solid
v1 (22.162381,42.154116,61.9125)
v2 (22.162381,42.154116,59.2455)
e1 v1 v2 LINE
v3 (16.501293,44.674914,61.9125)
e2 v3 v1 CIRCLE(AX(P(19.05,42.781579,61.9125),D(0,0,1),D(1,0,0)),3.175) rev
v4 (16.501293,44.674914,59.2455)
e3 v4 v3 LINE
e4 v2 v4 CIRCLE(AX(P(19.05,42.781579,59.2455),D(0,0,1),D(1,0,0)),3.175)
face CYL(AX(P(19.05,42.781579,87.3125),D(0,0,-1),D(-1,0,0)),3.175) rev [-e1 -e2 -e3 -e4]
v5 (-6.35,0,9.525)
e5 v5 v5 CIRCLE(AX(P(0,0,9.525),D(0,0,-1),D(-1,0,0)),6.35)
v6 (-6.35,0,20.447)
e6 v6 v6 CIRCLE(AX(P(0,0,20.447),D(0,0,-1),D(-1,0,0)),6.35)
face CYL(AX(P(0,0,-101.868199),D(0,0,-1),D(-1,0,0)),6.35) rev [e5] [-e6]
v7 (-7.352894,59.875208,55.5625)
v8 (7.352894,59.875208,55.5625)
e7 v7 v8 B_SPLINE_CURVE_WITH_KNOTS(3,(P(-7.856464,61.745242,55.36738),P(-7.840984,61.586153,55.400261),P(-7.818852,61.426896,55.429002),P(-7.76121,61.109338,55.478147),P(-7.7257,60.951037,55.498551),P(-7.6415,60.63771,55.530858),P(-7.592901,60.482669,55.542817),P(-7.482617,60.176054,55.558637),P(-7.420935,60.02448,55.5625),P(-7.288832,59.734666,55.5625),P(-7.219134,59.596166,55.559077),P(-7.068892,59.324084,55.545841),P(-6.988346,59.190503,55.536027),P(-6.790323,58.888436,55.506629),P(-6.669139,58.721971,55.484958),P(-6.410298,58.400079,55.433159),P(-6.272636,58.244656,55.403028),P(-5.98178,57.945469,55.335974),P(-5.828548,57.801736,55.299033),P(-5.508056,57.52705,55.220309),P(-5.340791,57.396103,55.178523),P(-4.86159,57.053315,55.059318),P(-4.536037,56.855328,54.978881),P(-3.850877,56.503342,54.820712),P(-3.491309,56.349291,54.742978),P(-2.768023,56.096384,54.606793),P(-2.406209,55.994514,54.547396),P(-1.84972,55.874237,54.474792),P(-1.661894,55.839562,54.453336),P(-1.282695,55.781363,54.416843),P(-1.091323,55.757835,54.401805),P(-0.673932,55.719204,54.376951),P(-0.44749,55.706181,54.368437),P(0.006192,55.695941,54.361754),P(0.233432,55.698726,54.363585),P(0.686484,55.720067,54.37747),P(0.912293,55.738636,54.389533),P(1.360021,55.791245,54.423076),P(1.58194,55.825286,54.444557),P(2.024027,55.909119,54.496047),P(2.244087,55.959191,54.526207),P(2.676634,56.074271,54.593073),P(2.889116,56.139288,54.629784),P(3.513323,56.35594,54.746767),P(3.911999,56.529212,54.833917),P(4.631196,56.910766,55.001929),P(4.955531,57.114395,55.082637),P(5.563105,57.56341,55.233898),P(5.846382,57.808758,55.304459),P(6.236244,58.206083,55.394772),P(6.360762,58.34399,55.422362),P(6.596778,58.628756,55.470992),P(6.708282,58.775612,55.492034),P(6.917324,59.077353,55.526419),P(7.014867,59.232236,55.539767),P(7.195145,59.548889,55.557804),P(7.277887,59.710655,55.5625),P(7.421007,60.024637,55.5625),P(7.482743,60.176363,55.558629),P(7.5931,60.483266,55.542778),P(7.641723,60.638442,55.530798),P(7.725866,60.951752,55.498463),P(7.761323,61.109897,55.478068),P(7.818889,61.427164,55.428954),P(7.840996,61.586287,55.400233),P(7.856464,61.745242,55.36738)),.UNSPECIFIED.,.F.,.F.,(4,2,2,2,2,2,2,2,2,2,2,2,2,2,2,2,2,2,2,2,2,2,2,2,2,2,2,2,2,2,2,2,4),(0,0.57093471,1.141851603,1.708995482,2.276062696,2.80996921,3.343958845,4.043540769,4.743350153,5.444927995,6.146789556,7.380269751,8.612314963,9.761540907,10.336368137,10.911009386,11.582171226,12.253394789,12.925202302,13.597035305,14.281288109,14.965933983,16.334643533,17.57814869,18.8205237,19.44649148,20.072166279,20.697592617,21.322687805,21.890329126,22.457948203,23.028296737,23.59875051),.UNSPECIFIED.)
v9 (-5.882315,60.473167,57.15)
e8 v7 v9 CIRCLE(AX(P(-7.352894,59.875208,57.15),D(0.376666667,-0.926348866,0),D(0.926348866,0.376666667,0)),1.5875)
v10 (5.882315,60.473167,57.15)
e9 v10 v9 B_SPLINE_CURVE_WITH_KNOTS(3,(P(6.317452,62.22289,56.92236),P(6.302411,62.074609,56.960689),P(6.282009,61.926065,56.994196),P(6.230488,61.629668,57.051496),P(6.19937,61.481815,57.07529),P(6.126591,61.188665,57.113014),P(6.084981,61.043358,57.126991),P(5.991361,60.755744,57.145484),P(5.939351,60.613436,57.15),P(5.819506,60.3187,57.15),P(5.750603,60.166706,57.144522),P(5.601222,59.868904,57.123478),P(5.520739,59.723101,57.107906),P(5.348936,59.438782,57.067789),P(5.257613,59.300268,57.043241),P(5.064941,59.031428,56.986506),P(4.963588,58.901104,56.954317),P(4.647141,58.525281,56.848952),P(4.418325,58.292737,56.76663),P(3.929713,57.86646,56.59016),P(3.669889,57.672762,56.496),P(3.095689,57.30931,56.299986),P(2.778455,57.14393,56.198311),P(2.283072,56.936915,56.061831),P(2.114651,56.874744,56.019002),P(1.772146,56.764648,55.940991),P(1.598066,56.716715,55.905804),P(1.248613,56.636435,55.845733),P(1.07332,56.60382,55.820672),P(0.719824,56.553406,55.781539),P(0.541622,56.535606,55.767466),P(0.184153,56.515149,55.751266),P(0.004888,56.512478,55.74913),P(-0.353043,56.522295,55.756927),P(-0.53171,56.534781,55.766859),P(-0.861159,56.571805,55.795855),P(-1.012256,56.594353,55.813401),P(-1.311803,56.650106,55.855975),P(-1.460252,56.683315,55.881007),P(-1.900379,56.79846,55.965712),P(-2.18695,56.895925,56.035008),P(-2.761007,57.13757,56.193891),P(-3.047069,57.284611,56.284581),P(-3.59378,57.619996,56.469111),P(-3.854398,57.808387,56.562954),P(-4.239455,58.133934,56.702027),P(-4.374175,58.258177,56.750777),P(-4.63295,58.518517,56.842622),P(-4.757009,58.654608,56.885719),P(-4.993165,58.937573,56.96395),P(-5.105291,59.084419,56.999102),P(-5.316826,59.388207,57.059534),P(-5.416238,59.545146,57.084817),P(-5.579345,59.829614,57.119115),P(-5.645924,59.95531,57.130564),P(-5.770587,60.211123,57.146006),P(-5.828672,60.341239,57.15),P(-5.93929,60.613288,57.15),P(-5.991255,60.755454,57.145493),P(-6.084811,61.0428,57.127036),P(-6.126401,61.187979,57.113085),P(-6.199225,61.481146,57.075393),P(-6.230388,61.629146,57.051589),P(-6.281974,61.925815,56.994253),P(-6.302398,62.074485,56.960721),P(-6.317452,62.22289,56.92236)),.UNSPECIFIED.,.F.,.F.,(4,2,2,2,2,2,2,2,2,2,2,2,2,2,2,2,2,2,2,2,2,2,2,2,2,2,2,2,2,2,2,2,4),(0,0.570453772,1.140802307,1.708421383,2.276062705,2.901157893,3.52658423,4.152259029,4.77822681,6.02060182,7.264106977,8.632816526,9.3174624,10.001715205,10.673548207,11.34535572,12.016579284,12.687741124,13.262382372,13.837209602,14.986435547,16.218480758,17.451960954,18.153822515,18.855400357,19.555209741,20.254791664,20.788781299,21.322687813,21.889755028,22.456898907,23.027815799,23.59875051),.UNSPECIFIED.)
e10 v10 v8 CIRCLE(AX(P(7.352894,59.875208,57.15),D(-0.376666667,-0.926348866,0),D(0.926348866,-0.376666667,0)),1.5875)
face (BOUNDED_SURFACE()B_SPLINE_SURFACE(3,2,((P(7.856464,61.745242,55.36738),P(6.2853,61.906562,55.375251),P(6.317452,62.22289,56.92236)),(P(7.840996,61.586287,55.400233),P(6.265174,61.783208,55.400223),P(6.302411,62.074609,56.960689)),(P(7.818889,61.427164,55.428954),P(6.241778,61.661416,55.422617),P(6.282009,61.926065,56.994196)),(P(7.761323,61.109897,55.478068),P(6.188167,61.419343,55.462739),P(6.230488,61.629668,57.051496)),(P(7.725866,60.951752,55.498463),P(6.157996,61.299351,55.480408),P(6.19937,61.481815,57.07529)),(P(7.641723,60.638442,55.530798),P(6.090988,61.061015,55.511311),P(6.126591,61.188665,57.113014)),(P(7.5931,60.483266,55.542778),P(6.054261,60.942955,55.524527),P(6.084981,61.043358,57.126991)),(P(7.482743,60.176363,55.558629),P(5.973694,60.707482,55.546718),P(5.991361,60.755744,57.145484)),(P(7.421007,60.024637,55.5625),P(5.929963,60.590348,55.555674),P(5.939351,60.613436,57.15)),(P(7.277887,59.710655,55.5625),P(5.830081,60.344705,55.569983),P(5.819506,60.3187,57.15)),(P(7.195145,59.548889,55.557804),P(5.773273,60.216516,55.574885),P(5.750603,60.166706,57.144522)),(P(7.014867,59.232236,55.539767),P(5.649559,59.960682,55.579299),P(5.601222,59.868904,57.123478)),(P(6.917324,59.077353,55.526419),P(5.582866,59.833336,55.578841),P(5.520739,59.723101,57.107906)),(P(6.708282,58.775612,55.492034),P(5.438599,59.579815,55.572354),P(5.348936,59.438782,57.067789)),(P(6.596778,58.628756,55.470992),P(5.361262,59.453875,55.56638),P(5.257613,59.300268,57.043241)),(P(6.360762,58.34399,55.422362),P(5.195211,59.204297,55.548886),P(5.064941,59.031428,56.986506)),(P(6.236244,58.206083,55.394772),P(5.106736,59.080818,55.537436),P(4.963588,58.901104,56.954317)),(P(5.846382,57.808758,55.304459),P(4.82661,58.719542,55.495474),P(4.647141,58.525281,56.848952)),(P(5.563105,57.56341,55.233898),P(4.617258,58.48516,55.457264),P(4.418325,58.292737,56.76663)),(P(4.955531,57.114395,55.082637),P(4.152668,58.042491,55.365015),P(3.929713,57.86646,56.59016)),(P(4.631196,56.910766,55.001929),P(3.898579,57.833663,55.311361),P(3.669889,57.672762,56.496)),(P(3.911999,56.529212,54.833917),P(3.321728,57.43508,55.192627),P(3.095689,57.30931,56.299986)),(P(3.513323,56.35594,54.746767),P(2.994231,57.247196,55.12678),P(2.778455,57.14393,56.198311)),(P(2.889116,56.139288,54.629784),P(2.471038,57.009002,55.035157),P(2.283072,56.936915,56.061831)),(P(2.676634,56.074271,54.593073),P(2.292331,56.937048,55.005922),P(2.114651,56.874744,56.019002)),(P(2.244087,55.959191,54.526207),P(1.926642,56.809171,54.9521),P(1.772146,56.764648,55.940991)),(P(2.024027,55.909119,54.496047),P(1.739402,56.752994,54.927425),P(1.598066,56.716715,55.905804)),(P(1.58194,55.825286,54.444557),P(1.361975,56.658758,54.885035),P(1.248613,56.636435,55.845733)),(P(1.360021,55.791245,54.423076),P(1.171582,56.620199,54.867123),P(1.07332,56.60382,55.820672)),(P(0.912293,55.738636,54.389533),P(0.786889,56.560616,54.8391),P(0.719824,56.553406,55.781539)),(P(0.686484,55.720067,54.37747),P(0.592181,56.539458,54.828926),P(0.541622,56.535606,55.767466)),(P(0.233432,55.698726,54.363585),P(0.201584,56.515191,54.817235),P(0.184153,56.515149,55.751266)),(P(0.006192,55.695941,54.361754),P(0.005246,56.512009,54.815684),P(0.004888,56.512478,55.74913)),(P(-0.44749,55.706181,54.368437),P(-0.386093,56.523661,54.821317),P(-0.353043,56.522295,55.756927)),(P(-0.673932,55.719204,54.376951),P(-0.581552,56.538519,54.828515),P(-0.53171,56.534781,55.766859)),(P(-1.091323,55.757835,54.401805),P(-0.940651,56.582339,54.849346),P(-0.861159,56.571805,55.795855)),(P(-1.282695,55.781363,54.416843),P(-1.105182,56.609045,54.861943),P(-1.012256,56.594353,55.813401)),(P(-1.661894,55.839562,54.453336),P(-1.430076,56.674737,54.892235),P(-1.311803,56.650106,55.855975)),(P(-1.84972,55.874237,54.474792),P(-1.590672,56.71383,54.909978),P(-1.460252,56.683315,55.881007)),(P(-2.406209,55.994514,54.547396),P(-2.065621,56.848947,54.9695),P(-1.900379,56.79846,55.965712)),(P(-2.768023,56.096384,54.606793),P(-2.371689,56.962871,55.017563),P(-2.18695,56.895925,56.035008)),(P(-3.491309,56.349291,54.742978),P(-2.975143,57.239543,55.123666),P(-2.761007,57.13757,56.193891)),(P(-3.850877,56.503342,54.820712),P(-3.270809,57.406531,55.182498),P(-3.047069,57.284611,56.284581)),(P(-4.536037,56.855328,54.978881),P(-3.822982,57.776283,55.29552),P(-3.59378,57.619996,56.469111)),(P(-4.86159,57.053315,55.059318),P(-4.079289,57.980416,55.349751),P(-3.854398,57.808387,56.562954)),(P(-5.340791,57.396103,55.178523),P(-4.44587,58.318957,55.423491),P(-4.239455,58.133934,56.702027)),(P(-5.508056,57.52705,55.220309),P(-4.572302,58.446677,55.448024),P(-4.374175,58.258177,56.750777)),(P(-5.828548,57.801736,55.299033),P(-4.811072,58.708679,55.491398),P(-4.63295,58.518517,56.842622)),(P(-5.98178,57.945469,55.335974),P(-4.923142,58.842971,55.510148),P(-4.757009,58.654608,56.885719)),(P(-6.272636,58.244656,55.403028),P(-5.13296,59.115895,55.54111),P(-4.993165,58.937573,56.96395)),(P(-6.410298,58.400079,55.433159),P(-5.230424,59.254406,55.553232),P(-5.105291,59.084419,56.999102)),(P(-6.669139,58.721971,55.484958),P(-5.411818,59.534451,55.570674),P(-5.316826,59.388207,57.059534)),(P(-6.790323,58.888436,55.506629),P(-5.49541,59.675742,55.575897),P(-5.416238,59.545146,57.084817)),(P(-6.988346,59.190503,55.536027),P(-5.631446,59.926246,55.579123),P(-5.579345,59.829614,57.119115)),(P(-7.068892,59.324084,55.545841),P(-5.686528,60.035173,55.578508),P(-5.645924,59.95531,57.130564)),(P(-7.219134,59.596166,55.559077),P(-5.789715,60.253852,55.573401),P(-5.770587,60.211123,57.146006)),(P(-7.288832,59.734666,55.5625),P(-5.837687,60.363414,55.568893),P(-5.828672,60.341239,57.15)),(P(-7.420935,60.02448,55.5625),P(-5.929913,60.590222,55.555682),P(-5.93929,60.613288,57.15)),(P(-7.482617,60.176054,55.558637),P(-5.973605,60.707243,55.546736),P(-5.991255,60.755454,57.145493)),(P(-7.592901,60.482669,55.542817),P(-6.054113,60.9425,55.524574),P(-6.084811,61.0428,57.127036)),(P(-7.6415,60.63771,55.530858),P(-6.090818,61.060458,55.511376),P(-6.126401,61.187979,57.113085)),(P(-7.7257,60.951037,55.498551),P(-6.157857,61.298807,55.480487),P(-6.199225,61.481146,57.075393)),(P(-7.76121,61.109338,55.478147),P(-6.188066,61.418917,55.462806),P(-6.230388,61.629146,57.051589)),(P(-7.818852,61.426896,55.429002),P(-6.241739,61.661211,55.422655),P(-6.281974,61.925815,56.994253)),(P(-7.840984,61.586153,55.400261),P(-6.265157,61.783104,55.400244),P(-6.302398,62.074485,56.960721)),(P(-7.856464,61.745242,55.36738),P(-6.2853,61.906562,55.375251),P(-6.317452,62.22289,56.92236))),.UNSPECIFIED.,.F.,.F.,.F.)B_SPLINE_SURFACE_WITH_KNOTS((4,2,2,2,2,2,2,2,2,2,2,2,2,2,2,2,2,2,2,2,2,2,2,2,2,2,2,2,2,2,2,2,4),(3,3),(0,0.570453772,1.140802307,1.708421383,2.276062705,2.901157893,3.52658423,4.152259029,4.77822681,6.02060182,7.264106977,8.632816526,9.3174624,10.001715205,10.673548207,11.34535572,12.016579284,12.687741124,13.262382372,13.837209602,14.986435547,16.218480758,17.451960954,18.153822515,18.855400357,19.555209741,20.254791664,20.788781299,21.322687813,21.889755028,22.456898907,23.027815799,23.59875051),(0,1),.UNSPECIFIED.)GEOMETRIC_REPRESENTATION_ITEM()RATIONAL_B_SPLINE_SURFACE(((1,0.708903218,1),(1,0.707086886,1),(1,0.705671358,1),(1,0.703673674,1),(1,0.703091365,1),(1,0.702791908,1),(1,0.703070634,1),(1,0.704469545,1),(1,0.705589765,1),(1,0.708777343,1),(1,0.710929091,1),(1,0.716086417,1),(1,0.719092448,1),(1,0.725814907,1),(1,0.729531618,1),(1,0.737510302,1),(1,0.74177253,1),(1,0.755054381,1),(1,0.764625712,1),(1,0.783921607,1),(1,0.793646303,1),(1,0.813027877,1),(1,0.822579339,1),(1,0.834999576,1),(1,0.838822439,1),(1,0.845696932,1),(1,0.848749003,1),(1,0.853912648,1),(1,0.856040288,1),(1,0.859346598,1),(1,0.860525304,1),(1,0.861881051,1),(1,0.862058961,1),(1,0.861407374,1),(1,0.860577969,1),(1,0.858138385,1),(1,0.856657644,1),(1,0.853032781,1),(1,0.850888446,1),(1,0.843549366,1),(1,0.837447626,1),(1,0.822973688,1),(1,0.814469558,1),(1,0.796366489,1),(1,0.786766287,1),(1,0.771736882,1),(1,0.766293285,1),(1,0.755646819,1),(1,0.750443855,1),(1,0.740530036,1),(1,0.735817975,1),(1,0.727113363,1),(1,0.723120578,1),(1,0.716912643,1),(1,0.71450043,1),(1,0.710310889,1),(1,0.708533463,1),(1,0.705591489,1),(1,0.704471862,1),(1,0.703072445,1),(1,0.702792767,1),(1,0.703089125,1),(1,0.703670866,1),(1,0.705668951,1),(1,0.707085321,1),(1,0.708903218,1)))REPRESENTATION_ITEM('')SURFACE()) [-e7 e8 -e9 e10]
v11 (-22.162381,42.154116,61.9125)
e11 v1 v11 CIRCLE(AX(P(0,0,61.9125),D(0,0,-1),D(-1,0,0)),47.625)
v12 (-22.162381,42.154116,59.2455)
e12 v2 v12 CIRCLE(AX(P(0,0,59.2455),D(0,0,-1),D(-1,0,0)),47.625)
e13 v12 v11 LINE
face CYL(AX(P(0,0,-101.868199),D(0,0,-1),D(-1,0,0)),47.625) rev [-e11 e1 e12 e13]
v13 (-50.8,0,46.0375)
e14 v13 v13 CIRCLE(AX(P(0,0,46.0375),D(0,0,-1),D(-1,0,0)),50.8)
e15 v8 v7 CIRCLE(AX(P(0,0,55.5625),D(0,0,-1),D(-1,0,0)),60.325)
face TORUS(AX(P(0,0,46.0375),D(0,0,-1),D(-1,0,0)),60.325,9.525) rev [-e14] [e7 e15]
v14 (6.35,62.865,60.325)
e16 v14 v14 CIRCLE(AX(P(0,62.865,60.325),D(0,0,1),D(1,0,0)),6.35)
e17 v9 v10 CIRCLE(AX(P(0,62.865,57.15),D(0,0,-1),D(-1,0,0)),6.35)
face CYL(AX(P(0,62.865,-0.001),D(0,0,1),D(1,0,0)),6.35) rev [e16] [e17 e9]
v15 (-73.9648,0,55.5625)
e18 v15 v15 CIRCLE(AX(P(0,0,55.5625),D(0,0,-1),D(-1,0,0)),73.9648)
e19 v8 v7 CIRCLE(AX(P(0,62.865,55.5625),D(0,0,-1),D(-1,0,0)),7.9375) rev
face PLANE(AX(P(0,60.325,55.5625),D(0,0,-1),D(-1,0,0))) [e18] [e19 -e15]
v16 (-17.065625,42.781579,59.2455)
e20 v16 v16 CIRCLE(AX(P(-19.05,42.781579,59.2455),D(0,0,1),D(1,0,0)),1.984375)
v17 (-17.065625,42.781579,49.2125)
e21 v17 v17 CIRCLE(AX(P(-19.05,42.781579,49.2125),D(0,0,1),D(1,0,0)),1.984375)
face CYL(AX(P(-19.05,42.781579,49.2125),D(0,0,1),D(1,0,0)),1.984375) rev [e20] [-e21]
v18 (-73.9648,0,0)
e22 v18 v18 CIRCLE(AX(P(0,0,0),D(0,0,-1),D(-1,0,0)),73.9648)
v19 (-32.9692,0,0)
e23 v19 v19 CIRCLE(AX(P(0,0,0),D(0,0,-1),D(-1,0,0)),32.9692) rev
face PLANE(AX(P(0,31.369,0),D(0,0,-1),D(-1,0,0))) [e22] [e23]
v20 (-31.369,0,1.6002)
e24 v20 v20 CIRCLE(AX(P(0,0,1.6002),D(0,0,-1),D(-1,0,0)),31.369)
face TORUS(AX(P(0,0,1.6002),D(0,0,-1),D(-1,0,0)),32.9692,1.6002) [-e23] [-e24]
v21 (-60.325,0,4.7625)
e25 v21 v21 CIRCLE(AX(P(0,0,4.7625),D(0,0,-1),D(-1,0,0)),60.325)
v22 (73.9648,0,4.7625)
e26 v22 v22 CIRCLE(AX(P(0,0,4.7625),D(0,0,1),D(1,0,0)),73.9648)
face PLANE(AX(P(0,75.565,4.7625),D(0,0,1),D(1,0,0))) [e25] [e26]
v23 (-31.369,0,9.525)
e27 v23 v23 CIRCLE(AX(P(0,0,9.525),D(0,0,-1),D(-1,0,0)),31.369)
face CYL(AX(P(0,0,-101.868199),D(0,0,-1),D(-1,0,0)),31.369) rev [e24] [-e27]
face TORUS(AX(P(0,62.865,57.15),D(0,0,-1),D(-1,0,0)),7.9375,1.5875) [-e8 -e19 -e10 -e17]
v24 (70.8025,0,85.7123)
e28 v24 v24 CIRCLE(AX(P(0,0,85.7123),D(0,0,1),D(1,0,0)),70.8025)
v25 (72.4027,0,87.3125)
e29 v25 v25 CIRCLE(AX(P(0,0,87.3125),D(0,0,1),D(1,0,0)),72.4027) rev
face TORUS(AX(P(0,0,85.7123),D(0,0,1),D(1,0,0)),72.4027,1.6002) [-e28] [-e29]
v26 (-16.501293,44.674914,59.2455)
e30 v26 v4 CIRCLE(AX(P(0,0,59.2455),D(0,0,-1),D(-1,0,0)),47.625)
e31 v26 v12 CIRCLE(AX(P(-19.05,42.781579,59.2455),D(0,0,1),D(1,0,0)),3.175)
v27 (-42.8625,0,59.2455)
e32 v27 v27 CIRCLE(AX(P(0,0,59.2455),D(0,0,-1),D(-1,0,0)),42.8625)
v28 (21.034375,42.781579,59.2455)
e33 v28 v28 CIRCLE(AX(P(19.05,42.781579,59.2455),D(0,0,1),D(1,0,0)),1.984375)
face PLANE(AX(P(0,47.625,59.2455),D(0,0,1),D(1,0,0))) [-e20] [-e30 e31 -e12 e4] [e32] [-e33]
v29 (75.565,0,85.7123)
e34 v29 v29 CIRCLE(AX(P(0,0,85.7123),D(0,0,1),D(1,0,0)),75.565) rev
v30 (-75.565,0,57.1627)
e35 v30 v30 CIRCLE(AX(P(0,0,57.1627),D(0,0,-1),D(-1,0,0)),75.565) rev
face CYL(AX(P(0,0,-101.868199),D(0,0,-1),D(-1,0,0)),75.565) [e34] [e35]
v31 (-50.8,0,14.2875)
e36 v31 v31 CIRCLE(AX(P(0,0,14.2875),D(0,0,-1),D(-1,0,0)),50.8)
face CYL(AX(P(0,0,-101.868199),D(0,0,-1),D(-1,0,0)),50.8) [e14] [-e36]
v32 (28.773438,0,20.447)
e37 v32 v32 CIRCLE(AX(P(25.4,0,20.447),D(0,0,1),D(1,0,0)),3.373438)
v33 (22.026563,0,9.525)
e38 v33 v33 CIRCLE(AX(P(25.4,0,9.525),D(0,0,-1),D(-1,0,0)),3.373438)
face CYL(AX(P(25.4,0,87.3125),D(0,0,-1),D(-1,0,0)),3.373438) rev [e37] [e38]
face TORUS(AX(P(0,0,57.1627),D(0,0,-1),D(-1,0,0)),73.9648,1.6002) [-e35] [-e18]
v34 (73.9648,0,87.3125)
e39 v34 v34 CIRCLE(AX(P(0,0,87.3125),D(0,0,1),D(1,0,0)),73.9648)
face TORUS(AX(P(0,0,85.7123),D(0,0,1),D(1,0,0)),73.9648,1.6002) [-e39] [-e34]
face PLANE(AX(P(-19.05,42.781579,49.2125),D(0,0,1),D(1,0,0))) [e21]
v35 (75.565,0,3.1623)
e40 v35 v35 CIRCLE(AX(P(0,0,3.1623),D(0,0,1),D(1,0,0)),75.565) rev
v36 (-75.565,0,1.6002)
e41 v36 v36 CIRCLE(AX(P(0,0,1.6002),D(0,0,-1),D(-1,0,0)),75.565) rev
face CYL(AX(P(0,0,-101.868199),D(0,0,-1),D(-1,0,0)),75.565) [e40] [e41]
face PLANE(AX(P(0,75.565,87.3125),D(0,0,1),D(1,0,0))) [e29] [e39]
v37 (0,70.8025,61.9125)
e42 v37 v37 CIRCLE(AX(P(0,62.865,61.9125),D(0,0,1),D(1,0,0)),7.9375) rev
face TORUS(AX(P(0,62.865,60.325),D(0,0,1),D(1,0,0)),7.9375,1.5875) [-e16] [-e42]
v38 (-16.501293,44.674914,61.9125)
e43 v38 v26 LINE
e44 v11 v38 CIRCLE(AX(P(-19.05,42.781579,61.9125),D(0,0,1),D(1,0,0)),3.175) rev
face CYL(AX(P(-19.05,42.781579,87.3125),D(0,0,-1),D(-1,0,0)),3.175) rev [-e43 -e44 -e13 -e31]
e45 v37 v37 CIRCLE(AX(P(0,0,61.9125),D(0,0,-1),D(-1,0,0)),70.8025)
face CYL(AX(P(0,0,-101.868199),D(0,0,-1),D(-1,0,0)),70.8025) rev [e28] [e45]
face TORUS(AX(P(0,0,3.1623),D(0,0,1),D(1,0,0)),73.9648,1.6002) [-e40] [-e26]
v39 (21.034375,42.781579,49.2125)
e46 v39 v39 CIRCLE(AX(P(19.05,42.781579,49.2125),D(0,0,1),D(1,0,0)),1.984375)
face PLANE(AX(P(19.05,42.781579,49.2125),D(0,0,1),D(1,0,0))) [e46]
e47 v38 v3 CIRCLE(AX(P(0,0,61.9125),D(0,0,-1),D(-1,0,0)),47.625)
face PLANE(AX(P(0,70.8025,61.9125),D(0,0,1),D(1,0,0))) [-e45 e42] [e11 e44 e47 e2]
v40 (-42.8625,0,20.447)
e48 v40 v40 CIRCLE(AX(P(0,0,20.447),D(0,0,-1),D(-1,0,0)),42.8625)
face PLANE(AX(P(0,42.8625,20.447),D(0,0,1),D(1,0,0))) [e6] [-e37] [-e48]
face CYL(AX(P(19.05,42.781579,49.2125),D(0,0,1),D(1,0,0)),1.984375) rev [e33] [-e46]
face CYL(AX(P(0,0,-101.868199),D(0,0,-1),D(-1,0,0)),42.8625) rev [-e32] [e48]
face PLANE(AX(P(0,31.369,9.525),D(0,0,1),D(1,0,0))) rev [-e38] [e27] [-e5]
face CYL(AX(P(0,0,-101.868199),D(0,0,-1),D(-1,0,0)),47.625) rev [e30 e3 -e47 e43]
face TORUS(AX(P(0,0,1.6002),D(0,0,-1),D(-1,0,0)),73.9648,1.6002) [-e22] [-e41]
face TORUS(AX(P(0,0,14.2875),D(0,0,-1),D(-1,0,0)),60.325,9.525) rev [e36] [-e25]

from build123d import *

# Parameters (mm, degrees)
CUT_EXTRUDE5_REACH = 125.504
SKETCH6_R          = 6.35
FILLET2_R          = 1.5875
SKETCH8_R          = 1.984375
CUT_EXTRUDE6_DEPTH = 12.7
FILLET3_R          = 1.6002
SKETCH9_R          = 3.175
CUT_EXTRUDE7_DEPTH = 123.189065469
SKETCH10_R         = 3.3734375
CUT_EXTRUDE8_DEPTH = 133.178037534


with BuildPart() as part:
    # Sketch1 → Base-Revolve (revolve)
    with BuildSketch(Plane.ZY, mode=Mode.PRIVATE) as base_revolve_sk:
        with BuildLine():
            Line((0, 31.369), (0, 75.565))
            Line((0, 75.565), (4.7625, 75.565))
            Line((4.7625, 75.565), (4.7625, 60.325))
            ThreePointArc((4.7625, 60.325), (7.552307909, 53.589807909), (14.2875, 50.8))
            Line((14.2875, 50.8), (46.0375, 50.8))
            ThreePointArc((46.0375, 50.8), (52.772692091, 53.589807909), (55.5625, 60.325))
            Line((55.5625, 60.325), (55.5625, 75.565))
            Line((55.5625, 75.565), (87.3125, 75.565))
            Line((87.3125, 75.565), (87.3125, 70.8025))
            Line((87.3125, 70.8025), (61.9125, 70.8025))
            Line((61.9125, 70.8025), (61.9125, 47.625))
            Line((61.9125, 47.625), (59.2455, 47.625))
            Line((59.2455, 47.625), (59.2455, 42.8625))
            Line((59.2455, 42.8625), (20.447, 42.8625))
            Line((20.447, 42.8625), (20.447, 6.35))
            Line((20.447, 6.35), (9.525, 6.35))
            Line((9.525, 6.35), (9.525, 31.369))
            Line((9.525, 31.369), (0, 31.369))
        make_face()
    revolve(base_revolve_sk.sketch.rotate(Axis((0, 0, -101.868198758), (0, 0, 1)), 90), axis=Axis((0, 0, -101.868198758), (0, 0, 1)))

    # Sketch6 → Cut-Extrude5 (cut, up to next)
    with BuildSketch(Plane.XY.offset(61.9125), mode=Mode.PRIVATE) as cut_extrude5_sk1:
        with Locations((0, 62.865)):
            Circle(SKETCH6_R)
    cut_extrude5_tool1 = extrude(cut_extrude5_sk1.sketch, amount=-CUT_EXTRUDE5_REACH, mode=Mode.PRIVATE) & part.part
    add(cut_extrude5_tool1.solids().sort_by_distance((0, 62.865, 61.9125))[0], mode=Mode.SUBTRACT)

    # Fillet2
    fillet2_edges = [part.edges().sort_by_distance(p)[0] for p in [
        (-1.442401613, 69.049009831, 55.5625),
        (6.184009831, 61.422598387, 55.5625),
        (-6.35, 62.865, 61.9125),
    ]]
    fillet(fillet2_edges, radius=FILLET2_R - 0.0001)  # a hair under: the kernel refuses the full size

    # Sketch8 → Cut-Extrude6 (cut)
    with BuildSketch(Plane.XY.offset(61.9125)):
        with Locations((19.05, 42.781578706)):
            Circle(SKETCH8_R)
        with Locations((-19.05, 42.781578706)):
            Circle(SKETCH8_R)
    extrude(amount=-CUT_EXTRUDE6_DEPTH, mode=Mode.SUBTRACT)

    # Fillet3
    fillet3_edges = [part.edges().sort_by_distance(p)[0] for p in [
        (75.565, 0, 4.7625),
        (75.565, 0, 0),
        (31.369, 0, 0),
        (70.8025, 0, 87.3125),
        (75.565, 0, 87.3125),
        (75.565, 0, 55.5625),
    ]]
    fillet(fillet3_edges, radius=FILLET3_R)

    # Sketch9 → Cut-Extrude7 (cut, through all)
    with BuildSketch(Plane.XY.offset(59.2455)):
        with Locations((19.05, 42.781578706)):
            Circle(SKETCH9_R)
        with Locations((-19.05, 42.781578706)):
            Circle(SKETCH9_R)
    extrude(amount=CUT_EXTRUDE7_DEPTH, mode=Mode.SUBTRACT)

    # Sketch10 → Cut-Extrude8 (cut, through all)
    with BuildSketch(Plane(origin=(0, 0, 9.525), x_dir=(-1, 0, 0), z_dir=(0, 0, -1))):
        with Locations((-25.4, 0)):
            Circle(SKETCH10_R)
    extrude(amount=-CUT_EXTRUDE8_DEPTH, mode=Mode.SUBTRACT)


solid = part.part
